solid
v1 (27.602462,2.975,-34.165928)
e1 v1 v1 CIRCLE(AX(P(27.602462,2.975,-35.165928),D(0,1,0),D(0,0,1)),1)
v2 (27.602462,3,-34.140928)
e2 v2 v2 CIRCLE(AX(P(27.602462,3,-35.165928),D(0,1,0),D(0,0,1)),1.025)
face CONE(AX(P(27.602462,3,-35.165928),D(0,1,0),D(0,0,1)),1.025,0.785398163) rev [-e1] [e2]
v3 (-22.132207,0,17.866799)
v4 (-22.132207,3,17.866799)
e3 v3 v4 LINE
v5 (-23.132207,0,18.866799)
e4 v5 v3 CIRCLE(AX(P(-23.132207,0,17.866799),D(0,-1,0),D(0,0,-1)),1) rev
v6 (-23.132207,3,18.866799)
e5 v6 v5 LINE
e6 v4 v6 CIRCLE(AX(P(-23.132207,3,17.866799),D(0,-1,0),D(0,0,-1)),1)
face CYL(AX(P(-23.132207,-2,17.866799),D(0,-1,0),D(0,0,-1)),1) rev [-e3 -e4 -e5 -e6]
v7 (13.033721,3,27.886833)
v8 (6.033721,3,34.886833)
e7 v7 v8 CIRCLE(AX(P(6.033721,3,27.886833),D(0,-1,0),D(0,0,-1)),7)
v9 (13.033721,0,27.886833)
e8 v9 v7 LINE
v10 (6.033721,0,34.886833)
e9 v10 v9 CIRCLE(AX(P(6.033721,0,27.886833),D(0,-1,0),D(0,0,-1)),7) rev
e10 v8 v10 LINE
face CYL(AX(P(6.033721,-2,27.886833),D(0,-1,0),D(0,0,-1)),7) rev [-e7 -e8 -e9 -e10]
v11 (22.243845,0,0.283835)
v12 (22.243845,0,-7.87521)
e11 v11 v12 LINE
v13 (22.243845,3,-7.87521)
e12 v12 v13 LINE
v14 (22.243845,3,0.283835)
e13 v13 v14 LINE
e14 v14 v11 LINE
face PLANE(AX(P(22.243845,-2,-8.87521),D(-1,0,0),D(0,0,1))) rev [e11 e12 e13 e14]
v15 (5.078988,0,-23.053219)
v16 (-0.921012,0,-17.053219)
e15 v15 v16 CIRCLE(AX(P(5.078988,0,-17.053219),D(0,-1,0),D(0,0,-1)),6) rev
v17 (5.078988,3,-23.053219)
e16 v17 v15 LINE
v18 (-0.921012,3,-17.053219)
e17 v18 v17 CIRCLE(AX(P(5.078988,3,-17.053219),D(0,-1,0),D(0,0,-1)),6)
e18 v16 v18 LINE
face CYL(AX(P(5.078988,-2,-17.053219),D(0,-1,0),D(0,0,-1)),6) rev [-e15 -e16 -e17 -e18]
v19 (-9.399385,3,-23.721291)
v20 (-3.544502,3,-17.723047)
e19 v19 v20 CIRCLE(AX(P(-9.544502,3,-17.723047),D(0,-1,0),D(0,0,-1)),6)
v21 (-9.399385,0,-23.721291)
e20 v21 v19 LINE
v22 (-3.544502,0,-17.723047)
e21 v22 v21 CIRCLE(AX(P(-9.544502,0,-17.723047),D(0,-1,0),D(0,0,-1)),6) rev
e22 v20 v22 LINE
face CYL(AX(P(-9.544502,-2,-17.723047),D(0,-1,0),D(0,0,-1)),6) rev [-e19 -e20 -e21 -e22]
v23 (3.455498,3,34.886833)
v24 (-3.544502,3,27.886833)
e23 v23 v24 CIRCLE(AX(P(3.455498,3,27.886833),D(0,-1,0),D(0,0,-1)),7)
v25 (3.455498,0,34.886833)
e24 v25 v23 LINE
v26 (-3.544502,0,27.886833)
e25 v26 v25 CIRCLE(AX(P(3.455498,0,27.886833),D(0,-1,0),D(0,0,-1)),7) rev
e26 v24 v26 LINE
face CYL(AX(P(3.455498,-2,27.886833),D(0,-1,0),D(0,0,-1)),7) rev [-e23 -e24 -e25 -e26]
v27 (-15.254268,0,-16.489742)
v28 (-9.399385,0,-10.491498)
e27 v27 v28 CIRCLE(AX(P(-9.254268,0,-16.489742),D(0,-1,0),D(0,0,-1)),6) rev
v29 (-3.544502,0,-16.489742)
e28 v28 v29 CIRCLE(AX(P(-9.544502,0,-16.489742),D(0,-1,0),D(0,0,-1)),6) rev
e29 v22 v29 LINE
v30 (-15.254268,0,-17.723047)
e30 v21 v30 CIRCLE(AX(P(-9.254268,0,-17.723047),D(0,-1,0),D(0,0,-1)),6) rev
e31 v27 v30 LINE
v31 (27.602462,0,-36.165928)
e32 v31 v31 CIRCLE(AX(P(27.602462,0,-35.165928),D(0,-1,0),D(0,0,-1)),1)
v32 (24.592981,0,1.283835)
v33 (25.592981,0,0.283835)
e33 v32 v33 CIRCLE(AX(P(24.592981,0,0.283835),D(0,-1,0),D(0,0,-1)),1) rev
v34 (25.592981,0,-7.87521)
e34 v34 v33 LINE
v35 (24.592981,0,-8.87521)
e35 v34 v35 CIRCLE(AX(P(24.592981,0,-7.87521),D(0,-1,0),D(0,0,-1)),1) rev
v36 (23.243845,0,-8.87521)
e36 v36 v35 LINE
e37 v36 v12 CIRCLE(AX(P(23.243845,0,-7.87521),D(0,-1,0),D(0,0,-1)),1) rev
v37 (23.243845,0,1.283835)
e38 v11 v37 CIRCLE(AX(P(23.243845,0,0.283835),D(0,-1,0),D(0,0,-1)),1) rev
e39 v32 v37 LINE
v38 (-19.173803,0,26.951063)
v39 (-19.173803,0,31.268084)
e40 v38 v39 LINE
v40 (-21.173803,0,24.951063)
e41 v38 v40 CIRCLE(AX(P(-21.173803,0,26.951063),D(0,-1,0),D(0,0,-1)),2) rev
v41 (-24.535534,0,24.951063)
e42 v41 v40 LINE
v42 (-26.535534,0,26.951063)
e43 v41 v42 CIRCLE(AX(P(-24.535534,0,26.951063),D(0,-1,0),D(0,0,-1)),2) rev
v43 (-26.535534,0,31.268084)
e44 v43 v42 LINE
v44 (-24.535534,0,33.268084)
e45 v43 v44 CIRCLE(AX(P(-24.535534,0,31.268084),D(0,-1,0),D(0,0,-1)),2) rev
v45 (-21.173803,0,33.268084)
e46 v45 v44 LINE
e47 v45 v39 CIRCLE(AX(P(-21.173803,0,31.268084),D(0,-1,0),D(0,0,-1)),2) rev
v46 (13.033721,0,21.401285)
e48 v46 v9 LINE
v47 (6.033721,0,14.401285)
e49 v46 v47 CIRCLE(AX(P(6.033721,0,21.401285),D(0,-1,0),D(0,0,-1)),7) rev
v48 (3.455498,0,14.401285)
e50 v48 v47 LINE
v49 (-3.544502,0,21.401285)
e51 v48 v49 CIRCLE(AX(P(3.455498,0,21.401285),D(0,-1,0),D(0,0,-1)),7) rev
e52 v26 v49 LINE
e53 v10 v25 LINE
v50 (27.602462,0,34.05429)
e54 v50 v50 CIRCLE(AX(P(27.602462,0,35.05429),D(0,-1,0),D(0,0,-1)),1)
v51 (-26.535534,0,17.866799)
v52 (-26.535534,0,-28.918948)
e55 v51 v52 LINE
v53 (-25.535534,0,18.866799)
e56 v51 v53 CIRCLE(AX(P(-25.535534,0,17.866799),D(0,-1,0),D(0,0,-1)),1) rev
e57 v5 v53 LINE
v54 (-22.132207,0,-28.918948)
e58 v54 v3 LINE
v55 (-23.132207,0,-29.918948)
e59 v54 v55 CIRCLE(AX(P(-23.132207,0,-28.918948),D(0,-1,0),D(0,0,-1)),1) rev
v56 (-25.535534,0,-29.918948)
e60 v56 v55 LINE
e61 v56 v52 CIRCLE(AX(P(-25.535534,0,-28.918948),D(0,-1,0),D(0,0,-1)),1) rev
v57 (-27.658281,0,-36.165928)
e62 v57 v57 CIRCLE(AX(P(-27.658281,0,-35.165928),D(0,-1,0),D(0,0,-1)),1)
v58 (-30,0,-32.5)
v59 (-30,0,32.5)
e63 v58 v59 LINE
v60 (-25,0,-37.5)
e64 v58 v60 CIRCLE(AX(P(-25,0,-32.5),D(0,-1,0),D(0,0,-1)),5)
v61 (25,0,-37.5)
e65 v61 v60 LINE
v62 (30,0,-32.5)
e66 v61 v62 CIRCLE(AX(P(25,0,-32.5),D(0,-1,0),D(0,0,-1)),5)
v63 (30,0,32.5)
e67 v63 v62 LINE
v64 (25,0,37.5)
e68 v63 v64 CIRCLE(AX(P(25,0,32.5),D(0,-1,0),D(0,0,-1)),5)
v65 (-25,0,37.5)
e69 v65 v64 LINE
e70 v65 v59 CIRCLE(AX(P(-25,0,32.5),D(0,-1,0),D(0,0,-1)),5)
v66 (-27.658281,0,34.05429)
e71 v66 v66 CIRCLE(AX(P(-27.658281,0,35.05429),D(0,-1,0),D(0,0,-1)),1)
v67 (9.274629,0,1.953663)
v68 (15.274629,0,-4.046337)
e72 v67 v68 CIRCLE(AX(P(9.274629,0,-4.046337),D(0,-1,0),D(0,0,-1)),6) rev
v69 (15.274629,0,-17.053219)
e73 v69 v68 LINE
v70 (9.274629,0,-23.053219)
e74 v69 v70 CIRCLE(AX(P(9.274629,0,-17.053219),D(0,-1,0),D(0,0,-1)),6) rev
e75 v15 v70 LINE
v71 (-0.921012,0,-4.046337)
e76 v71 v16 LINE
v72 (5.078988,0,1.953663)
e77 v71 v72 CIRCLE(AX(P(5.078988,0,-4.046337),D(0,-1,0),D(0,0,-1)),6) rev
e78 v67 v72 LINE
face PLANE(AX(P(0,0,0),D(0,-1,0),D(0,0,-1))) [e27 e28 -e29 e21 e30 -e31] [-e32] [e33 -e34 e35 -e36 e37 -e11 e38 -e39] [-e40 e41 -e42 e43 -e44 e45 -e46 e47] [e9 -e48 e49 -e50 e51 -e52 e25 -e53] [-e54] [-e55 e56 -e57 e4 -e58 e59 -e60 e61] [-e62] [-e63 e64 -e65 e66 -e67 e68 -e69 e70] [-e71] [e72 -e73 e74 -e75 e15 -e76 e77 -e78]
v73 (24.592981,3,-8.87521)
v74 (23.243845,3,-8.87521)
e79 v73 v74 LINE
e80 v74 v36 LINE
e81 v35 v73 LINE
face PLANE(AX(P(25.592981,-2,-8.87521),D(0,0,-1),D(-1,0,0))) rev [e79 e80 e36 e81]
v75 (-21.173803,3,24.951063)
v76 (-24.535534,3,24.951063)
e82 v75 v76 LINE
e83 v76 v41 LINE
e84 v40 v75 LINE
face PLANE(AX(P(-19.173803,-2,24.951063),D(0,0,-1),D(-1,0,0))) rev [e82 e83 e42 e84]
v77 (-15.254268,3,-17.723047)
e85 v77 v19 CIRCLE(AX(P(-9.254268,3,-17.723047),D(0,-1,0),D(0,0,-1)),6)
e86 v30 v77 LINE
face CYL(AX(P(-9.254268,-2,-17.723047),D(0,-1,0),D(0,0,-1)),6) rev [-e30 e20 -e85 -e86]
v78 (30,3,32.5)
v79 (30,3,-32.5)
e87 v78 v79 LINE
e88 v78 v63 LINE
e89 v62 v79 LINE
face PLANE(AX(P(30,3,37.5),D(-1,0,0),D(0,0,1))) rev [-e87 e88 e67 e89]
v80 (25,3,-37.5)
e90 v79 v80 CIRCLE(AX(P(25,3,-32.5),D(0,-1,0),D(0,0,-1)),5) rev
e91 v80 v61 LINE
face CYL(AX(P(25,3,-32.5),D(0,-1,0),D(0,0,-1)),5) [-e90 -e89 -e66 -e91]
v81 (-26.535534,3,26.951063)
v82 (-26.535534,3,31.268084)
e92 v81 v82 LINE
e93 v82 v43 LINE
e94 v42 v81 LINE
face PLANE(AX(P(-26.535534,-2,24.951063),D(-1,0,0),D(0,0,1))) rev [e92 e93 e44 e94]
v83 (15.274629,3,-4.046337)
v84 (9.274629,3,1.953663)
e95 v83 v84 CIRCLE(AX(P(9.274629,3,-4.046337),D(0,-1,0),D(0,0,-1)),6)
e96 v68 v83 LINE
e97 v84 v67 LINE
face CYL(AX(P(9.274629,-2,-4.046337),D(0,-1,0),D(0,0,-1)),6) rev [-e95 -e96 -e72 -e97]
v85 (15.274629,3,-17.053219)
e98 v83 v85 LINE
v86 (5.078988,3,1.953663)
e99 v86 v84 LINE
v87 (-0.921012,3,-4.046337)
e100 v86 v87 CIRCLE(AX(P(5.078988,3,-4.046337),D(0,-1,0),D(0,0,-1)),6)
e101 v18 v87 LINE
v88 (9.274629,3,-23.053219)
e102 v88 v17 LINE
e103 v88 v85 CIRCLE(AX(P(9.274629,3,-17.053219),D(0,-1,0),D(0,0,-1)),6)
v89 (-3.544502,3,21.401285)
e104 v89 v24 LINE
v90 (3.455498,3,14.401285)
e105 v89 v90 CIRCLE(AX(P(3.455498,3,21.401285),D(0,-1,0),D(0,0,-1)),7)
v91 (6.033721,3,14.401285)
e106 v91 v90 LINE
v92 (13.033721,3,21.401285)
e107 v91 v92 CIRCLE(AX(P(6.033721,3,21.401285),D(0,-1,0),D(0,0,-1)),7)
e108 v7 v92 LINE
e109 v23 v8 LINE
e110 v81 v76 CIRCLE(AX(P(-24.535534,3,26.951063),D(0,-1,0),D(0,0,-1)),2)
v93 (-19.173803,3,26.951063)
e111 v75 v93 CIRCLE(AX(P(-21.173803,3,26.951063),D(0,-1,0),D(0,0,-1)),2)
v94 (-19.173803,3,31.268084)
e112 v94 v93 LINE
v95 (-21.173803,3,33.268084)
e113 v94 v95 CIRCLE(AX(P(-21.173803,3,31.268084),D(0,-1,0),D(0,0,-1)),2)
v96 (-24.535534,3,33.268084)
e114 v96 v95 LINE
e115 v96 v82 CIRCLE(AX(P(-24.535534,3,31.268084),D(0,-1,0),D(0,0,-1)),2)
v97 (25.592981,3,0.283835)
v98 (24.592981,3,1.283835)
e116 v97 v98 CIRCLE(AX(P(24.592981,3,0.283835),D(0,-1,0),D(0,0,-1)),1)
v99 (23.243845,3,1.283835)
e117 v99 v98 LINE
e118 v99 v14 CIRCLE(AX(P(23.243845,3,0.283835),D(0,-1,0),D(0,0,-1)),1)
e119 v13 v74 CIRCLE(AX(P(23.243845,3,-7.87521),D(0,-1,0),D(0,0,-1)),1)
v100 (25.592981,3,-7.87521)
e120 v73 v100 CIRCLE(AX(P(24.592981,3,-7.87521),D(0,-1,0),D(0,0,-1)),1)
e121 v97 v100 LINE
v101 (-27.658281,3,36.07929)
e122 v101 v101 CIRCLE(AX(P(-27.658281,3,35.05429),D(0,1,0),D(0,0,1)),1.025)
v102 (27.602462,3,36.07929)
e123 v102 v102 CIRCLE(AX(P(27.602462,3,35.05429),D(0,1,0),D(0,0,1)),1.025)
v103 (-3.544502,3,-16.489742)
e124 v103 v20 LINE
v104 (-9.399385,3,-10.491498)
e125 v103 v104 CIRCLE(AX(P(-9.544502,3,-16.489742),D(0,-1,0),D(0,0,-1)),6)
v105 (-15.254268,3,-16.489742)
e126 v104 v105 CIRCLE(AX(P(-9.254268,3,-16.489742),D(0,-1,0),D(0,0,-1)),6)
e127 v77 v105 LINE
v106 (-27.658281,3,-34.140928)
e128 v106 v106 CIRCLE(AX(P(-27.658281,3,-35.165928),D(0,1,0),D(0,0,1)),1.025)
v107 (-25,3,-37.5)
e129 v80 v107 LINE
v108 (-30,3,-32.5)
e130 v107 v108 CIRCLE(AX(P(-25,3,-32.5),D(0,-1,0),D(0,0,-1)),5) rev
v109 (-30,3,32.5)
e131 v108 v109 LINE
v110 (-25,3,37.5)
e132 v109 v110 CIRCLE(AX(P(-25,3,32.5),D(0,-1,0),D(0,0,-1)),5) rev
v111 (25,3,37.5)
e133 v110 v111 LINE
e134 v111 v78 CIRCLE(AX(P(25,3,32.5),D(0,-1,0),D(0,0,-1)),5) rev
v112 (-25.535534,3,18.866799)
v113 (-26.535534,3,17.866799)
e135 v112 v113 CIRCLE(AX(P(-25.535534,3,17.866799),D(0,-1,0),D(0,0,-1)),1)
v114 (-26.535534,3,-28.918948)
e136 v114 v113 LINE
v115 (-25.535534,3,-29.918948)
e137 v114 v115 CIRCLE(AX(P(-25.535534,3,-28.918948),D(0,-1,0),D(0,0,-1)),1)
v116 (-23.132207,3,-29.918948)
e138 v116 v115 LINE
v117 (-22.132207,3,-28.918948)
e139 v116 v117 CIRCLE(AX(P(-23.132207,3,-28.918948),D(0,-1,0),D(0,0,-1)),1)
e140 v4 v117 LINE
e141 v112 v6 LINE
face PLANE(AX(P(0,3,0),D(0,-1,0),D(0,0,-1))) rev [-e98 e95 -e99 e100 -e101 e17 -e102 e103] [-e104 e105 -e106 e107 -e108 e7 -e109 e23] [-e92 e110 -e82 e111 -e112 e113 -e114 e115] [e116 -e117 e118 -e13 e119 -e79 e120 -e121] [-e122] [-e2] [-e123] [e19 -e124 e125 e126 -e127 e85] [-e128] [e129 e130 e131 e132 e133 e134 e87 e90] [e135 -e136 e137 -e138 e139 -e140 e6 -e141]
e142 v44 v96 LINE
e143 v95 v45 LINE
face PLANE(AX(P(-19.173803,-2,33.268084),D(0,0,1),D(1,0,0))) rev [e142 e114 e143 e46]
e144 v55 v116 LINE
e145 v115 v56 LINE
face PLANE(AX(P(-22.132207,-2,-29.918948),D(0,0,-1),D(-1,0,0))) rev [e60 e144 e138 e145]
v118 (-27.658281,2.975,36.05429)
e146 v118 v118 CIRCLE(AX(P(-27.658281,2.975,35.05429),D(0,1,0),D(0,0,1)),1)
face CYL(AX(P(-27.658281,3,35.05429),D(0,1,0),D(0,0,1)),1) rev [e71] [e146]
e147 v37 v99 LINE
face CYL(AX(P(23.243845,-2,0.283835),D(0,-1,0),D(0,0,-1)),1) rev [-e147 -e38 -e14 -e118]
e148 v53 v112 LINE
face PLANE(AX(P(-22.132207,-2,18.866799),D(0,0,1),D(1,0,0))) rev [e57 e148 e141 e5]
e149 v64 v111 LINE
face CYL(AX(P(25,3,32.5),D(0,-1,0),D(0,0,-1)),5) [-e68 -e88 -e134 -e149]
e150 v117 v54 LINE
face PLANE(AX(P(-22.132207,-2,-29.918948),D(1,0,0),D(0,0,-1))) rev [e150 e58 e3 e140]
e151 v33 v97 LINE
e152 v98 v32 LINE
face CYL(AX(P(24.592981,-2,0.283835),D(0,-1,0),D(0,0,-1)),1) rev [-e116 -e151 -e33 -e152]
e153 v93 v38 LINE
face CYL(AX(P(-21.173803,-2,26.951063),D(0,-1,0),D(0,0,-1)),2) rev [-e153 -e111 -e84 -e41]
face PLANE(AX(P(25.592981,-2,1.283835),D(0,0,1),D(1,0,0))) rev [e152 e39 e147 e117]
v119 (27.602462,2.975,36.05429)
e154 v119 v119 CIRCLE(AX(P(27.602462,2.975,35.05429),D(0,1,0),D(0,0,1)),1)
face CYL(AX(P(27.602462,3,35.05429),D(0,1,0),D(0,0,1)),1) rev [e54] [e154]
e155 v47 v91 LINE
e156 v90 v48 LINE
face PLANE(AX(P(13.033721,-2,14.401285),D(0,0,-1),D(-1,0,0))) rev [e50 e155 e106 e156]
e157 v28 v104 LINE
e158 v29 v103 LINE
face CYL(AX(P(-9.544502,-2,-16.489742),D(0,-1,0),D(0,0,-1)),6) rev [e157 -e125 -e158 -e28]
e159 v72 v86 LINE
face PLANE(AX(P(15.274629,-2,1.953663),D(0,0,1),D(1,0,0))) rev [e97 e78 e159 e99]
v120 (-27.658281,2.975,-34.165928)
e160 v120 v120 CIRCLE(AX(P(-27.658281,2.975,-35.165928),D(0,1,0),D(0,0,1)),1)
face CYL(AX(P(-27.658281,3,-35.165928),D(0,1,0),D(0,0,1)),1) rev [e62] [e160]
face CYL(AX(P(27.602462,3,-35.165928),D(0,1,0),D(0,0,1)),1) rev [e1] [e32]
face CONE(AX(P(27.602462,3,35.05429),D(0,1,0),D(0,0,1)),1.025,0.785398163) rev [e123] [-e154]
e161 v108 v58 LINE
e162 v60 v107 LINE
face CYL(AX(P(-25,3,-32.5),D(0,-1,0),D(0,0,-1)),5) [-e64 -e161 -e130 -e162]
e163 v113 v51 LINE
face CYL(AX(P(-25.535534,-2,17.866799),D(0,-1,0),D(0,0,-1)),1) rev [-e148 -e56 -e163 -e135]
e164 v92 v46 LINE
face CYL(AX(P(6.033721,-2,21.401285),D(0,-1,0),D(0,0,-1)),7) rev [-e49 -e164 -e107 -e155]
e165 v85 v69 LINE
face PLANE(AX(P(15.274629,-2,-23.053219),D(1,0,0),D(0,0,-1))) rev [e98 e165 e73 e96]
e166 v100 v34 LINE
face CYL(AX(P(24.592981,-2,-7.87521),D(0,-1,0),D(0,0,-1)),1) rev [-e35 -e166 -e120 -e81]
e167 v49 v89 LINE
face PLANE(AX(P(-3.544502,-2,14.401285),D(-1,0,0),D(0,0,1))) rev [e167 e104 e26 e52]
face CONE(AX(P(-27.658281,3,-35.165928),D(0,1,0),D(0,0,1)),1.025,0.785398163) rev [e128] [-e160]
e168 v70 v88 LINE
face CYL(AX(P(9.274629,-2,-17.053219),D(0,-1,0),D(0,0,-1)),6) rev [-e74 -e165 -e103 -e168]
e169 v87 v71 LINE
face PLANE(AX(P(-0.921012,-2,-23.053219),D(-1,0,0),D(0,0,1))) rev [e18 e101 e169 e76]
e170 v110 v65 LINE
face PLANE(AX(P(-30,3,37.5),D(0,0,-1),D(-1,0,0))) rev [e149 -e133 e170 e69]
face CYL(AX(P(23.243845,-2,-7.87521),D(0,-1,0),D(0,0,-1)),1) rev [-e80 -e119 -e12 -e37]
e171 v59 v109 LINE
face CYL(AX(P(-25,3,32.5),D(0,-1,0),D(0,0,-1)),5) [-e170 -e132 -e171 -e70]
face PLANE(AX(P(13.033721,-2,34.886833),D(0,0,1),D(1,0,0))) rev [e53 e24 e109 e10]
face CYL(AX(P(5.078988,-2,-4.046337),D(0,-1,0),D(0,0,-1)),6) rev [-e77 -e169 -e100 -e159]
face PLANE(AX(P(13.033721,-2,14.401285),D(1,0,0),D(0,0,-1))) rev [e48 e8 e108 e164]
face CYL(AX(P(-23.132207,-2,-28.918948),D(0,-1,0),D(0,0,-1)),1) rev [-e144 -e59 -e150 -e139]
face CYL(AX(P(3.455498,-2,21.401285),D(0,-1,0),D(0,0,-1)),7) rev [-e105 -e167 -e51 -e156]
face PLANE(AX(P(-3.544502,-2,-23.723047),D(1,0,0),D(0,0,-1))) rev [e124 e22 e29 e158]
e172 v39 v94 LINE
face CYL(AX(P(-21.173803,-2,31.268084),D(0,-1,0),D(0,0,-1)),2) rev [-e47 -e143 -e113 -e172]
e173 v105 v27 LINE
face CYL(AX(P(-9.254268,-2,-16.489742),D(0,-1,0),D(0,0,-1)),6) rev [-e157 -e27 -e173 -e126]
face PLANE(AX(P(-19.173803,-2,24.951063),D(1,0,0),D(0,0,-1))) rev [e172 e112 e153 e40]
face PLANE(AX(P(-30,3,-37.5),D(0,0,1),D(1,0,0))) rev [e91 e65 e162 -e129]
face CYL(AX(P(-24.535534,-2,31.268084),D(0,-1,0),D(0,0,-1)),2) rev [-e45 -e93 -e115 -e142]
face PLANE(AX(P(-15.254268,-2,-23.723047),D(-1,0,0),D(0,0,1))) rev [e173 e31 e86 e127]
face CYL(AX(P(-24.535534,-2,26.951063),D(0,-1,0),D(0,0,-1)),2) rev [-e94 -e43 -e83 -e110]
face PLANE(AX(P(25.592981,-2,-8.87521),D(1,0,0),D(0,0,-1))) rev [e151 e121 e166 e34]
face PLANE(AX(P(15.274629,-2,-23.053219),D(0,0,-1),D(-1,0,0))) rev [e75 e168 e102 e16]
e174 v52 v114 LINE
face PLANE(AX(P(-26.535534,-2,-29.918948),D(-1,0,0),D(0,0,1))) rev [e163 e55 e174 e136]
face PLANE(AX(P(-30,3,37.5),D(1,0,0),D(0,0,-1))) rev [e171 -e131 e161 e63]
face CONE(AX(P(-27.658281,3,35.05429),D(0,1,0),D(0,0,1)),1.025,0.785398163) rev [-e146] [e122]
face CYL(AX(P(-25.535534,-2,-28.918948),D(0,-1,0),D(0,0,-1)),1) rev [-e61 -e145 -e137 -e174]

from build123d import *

# Parameters (mm, degrees)
SKIZZE1_W                                = 60
SKIZZE1_H                                = 75
AUFSATZ_LINEAR_AUSTRAGEN1_DEPTH          = 3
VERRUNDUNG1_R                            = 5
F_2_0_2_DURCHMESSER_BOHRUNG1_D           = 2
F_2_0_2_DURCHMESSER_BOHRUNG1_DEPTH       = 20
F_2_0_2_DURCHMESSER_BOHRUNG1_CSINK_D     = 2.05
F_2_0_2_DURCHMESSER_BOHRUNG1_CSINK_ANGLE = 90
F_2_0_2_DURCHMESSER_BOHRUNG1_TIP         = 0.600860619
SKIZZE4_W                                = 25.006881973
SKIZZE4_H                                = 16.195641819
SKIZZE4_W_2                              = 8.317021013
SKIZZE4_H_2                              = 7.361730429
SKIZZE4_W_3                              = 20.485548402
SKIZZE4_H_3                              = 16.578223094
SKIZZE4_W_4                              = 10.159045801
SKIZZE4_H_4                              = 3.349135978
SKIZZE4_W_5                              = 48.785747421
SKIZZE4_H_5                              = 4.403326981
SKIZZE4_W_6                              = 13.233304068
SKIZZE4_H_6                              = 11.709766254
SCHNITT_LINEAR_AUSTRAGEN1_DEPTH          = 5
VERRUNDUNG2_R                            = 6
VERRUNDUNG3_R                            = 1
VERRUNDUNG4_R                            = 7
VERRUNDUNG5_R                            = 2


with BuildPart() as part:
    # Skizze1 → Aufsatz-Linear austragen1 (new body)
    with BuildSketch(Plane(origin=(0, 0, 0), x_dir=(1, 0, 0), z_dir=(0, 1, 0))):
        Rectangle(SKIZZE1_W, SKIZZE1_H)
    extrude(amount=AUFSATZ_LINEAR_AUSTRAGEN1_DEPTH)

    # Verrundung1
    verrundung1_edges = [part.edges().sort_by_distance(p)[0] for p in [
        (30, 1.5, 37.5),
        (-30, 1.5, 37.5),
        (-30, 1.5, -37.5),
        (30, 1.5, -37.5),
    ]]
    fillet(verrundung1_edges, radius=VERRUNDUNG1_R)

    # Ø2.0 (2) Durchmesser Bohrung1
    with Locations(Plane.ZX.offset(3)):
        with Locations((-35.165927774, 27.602462356), (35.054289908, 27.602462356), (35.054289908, -27.658281289), (-35.165927774, -27.658281289)):
            CounterSinkHole(F_2_0_2_DURCHMESSER_BOHRUNG1_D / 2, F_2_0_2_DURCHMESSER_BOHRUNG1_CSINK_D / 2, depth=F_2_0_2_DURCHMESSER_BOHRUNG1_DEPTH, counter_sink_angle=F_2_0_2_DURCHMESSER_BOHRUNG1_CSINK_ANGLE)
            with Locations((0, 0, -(F_2_0_2_DURCHMESSER_BOHRUNG1_DEPTH + F_2_0_2_DURCHMESSER_BOHRUNG1_TIP / 2))):  # 118° drill point
                Cone(0, F_2_0_2_DURCHMESSER_BOHRUNG1_D / 2, F_2_0_2_DURCHMESSER_BOHRUNG1_TIP, mode=Mode.SUBTRACT)

    # Skizze4 → Schnitt-Linear austragen1 (cut)
    with BuildSketch(Plane.ZX.offset(3)):
        with Locations((-10.549778333, 7.176808516)):
            Rectangle(SKIZZE4_W, SKIZZE4_H)
        with Locations((29.109573547, -22.854668692)):
            Rectangle(SKIZZE4_W_2, SKIZZE4_H_2)
        with Locations((24.644058909, 4.744609303)):
            Rectangle(SKIZZE4_W_3, SKIZZE4_H_3)
        with Locations((-3.795687443, 23.91841278)):
            Rectangle(SKIZZE4_W_4, SKIZZE4_H_4)
        with Locations((-5.526074365, -24.333870416)):
            Rectangle(SKIZZE4_W_5, SKIZZE4_H_5)
        with Locations((-17.106394481, -9.399385371)):
            Rectangle(SKIZZE4_W_6, SKIZZE4_H_6)
    extrude(amount=-SCHNITT_LINEAR_AUSTRAGEN1_DEPTH, mode=Mode.SUBTRACT)

    # Verrundung2
    # the kernel refuses this fillet: 6 mm, written as the material it adds along each edge
    with BuildSketch(Plane(origin=(-15.254268498, 3, -23.723046515), x_dir=(1, 0, 0), z_dir=(0, -1, 0)), Plane(origin=(-3.544502244, 3, -23.723046515), x_dir=(0, 0, 1), z_dir=(0, -1, 0)), Plane(origin=(-3.544502244, 3, -10.489742447), x_dir=(-1, 0, 0), z_dir=(0, -1, 0)), Plane(origin=(-0.921012394, 3, -23.053219319), x_dir=(1, 0, 0), z_dir=(0, -1, 0)), Plane(origin=(15.274629425, 3, -23.053219319), x_dir=(0, 0, 1), z_dir=(0, -1, 0)), Plane(origin=(15.274629425, 3, 1.953662654), x_dir=(-1, 0, 0), z_dir=(0, -1, 0))) as verrundung2_piece_1:
        with BuildLine():
            CenterArc((VERRUNDUNG2_R, VERRUNDUNG2_R), VERRUNDUNG2_R, 180, 90)
            Line((0, VERRUNDUNG2_R), (0, 0))
            Line((0, 0), (VERRUNDUNG2_R, 0))
        make_face()
    extrude(amount=3)
    with BuildSketch(Plane(origin=(-15.254268498, 3, -10.489742447), x_dir=(1, 0, 0), z_dir=(0, -1, 0)), Plane(origin=(-0.921012394, 3, 1.953662654), x_dir=(1, 0, 0), z_dir=(0, -1, 0))) as verrundung2_piece_2:
        with BuildLine():
            CenterArc((VERRUNDUNG2_R, -VERRUNDUNG2_R), VERRUNDUNG2_R, 90, 90)
            Line((0, -VERRUNDUNG2_R), (0, 0))
            Line((0, 0), (VERRUNDUNG2_R, 0))
        make_face()
    extrude(amount=3)

    # Verrundung3
    verrundung3_edges = [part.edges().sort_by_distance(p)[0] for p in [
        (-26.535533906, 1.5, -29.918948075),
        (-22.132206925, 1.5, -29.918948075),
        (-22.132206925, 1.5, 18.866799346),
        (-26.535533906, 1.5, 18.866799346),
        (22.243844791, 1.5, -8.875210343),
        (25.592980769, 1.5, -8.875210343),
        (25.592980769, 1.5, 1.283835458),
        (22.243844791, 1.5, 1.283835458),
    ]]
    fillet(verrundung3_edges, radius=VERRUNDUNG3_R)

    # Verrundung4
    verrundung4_edges = [part.edges().sort_by_distance(p)[0] for p in [
        (-3.544502244, 1.5, 14.401284708),
        (13.03372085, 1.5, 14.401284708),
        (13.03372085, 1.5, 34.88683311),
        (-3.544502244, 1.5, 34.88683311),
    ]]
    fillet(verrundung4_edges, radius=VERRUNDUNG4_R)

    # Verrundung5
    verrundung5_edges = [part.edges().sort_by_distance(p)[0] for p in [
        (-26.535533906, 1.5, 24.95106304),
        (-19.173803477, 1.5, 24.95106304),
        (-19.173803477, 1.5, 33.268084053),
        (-26.535533906, 1.5, 33.268084053),
    ]]
    fillet(verrundung5_edges, radius=VERRUNDUNG5_R)


solid = part.part
